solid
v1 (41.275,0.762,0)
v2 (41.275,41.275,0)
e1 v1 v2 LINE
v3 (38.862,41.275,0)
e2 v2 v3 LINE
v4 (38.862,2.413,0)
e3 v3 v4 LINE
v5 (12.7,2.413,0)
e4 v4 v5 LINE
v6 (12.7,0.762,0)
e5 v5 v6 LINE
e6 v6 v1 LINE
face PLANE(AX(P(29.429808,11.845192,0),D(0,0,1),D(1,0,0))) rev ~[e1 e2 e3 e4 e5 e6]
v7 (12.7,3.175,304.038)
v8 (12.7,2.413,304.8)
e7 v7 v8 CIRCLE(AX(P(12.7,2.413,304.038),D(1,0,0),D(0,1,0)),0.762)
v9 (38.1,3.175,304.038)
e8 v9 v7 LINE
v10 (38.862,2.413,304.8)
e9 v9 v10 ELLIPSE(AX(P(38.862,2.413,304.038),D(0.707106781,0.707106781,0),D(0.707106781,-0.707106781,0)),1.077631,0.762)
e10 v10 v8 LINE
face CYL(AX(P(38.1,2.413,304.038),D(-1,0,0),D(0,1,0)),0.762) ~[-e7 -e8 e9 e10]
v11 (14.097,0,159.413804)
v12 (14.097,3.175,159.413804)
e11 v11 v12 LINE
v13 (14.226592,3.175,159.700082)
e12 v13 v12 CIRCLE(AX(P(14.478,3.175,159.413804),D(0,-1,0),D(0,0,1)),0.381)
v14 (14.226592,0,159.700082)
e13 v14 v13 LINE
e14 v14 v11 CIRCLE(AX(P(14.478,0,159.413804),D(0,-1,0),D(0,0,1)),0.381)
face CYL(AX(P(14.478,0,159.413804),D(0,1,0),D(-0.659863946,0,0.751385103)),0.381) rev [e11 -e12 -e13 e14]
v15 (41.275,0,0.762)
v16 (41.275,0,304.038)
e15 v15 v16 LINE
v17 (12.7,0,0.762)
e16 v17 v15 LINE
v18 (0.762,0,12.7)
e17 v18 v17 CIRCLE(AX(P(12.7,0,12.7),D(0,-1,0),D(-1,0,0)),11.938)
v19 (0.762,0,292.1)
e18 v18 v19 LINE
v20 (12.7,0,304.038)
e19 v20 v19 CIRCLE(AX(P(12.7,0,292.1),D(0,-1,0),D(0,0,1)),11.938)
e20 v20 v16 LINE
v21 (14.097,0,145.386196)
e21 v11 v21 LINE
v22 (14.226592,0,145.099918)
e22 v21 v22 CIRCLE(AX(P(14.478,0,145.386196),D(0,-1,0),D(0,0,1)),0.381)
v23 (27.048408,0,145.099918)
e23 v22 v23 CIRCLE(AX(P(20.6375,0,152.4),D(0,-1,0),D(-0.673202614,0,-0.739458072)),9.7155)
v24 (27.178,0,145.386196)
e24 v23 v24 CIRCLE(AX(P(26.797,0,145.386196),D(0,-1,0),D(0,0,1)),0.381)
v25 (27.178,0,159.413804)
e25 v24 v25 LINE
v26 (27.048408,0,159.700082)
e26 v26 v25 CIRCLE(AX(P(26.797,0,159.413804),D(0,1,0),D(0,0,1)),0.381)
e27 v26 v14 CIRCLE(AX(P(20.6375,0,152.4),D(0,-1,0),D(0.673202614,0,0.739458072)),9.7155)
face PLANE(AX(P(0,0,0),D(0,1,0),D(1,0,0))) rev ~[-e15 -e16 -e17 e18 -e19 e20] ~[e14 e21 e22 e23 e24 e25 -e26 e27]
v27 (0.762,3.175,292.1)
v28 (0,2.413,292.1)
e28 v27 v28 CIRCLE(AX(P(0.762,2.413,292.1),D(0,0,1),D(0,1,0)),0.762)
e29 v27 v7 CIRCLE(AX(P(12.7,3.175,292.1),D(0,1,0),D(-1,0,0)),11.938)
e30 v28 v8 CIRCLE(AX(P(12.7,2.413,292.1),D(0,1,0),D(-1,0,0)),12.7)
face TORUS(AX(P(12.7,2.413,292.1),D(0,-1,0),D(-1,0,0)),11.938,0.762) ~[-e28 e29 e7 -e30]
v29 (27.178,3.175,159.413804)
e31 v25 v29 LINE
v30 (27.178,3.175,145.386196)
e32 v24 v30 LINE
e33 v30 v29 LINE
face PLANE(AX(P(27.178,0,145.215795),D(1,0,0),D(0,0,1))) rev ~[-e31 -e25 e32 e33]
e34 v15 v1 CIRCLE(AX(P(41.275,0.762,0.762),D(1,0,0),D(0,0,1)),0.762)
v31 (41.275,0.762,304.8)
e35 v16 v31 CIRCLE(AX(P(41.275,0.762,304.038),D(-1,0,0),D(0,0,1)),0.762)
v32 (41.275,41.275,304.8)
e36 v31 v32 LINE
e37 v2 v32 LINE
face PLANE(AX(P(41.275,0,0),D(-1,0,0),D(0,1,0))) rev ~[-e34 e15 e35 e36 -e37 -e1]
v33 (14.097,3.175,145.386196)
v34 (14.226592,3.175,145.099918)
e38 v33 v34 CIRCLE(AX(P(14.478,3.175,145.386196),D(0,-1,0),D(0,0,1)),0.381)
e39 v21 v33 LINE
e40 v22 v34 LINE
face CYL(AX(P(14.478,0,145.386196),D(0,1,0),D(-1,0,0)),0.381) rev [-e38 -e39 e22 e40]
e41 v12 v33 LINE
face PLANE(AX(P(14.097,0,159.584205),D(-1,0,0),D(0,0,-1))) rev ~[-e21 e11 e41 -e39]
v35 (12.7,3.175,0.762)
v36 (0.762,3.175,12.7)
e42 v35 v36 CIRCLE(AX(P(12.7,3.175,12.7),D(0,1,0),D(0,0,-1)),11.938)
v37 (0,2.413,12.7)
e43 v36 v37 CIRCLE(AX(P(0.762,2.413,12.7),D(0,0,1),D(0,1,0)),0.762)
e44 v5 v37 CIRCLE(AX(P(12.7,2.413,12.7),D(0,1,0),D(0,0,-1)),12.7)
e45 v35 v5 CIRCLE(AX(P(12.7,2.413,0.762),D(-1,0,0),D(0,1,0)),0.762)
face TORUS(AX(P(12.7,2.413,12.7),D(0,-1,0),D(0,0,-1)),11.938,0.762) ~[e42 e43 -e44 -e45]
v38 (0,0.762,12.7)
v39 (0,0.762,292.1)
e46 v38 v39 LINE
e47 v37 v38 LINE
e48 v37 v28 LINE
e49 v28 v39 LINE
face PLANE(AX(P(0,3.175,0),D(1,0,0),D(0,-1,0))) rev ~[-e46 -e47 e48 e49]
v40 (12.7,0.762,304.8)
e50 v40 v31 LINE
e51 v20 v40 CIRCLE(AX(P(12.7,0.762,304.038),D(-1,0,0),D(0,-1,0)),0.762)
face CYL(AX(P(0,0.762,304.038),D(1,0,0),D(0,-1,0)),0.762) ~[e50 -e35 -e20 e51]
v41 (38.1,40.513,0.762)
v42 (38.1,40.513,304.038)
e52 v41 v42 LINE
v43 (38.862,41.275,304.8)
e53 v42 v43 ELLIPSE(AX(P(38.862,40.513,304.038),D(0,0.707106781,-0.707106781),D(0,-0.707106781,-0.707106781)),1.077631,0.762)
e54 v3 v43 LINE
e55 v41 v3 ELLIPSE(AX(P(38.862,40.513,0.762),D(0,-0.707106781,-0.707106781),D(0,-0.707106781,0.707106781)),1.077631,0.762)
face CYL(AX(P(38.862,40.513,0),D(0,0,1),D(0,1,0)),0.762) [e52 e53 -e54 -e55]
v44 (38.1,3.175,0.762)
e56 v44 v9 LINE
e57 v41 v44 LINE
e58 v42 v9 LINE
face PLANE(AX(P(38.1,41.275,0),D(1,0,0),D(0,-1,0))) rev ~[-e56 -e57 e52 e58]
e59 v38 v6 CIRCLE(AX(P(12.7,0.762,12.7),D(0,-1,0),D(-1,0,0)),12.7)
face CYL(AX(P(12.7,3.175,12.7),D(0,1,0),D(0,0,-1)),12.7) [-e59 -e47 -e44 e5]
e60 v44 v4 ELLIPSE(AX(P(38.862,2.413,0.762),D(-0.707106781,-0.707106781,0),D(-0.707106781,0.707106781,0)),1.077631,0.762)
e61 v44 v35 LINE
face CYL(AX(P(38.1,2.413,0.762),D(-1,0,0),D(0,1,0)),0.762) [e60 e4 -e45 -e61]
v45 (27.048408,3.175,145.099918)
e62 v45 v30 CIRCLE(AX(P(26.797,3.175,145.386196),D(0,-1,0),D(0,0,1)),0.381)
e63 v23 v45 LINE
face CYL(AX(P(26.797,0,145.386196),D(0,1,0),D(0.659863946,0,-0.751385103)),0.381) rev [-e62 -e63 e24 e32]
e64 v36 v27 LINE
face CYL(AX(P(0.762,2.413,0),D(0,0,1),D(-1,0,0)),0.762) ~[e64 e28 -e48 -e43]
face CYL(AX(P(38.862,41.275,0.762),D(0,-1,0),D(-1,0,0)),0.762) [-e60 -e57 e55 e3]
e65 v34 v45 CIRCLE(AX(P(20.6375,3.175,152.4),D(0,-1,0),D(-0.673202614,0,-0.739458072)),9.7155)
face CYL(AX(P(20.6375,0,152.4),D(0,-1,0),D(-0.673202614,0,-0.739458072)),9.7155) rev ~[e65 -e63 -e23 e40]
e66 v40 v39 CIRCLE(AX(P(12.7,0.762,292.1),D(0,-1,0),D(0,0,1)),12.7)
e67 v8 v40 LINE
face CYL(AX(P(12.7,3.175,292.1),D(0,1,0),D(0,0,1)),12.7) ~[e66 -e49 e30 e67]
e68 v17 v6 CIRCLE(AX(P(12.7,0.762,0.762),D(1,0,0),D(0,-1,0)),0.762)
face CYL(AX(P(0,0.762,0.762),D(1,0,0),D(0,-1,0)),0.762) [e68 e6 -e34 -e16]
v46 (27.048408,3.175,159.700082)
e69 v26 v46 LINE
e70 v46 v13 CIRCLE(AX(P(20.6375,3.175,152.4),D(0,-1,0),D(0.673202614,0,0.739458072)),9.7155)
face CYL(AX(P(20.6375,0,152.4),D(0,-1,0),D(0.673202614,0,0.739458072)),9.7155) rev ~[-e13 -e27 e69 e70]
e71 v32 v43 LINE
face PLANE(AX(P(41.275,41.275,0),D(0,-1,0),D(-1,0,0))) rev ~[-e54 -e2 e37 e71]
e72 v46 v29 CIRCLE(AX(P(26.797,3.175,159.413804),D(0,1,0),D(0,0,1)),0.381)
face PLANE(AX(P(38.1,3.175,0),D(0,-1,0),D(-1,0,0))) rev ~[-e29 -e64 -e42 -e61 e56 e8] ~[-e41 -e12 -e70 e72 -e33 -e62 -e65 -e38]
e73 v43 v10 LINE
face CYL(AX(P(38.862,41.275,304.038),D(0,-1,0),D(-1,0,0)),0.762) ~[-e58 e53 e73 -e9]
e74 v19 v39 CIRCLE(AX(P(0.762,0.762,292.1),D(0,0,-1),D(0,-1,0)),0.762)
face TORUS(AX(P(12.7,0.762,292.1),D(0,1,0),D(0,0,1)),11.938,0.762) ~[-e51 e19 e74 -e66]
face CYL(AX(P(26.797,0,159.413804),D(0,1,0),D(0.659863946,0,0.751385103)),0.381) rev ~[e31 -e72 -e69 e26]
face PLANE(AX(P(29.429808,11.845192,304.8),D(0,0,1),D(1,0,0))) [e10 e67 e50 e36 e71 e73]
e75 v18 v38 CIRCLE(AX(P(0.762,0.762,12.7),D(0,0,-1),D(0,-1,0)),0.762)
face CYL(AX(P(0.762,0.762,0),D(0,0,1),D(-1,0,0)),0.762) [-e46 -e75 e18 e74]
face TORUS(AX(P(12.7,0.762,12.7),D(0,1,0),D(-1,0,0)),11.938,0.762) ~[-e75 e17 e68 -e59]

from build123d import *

# Parameters (mm, degrees)
F1_DEPTH     = 304.8
F2_R         = 0.762
F5_DEPTH     = 25.4
F6_R         = 0.381
F7_T1_DEPTH  = 3.175
F7_T4_ANGLE  = 90
F7_T6_ANGLE  = 90
F7_T8_ANGLE  = 90
F7_T10_ANGLE = 90


# Not quite as in the source:
# - a fillet or chamfer that OpenCascade refuses, or shapes differently, is made with other operations: its cross-section is extruded or revolved along the edge and cut away or added


with BuildPart() as f1:
    # F0 (on Top) → F1 (new body)
    with BuildSketch(Plane.XY):
        Polygon((0, 3.175), (0, 0), (41.275, 0), (41.275, 41.275), (38.1, 41.275), (38.1, 3.175), align=None)
    extrude(amount=F1_DEPTH)

    # F2
    f2_edges = [f1.edges().sort_by_distance(p)[0] for p in [
        (0, 0, 152.4),
        (20.6375, 0, 304.8),
        (20.6375, 0, 0),
        (38.1, 22.225, 304.8),
        (19.05, 3.175, 304.8),
        (0, 3.175, 152.4),
        (19.05, 3.175, 0),
        (38.1, 22.225, 0),
        (38.1, 41.275, 152.4),
    ]]
    fillet(f2_edges, radius=F2_R)

    # F4 (on face) → F5 (cut)
    with BuildSketch(Plane.XZ):
        with BuildLine():
            ThreePointArc((27.178, 159.5842048969), (20.6375, 162.1155), (14.097, 159.5842048969))
            Line((14.097, 159.5842048969), (14.097, 145.2157951031))
            ThreePointArc((14.097, 145.2157951031), (20.6375, 142.6845), (27.178, 145.2157951031))
            Line((27.178, 145.2157951031), (27.178, 159.5842048969))
        make_face()
    extrude(amount=-F5_DEPTH, mode=Mode.SUBTRACT)

    # F6
    f6_edges = [f1.edges().sort_by_distance(p)[0] for p in [
        (14.097, 1.5875, 145.215795),
        (14.097, 1.5875, 159.584205),
        (27.178, 1.5875, 159.584205),
        (27.178, 1.5875, 145.215795),
    ]]
    fillet(f6_edges, radius=F6_R)

    # F7: fillet of radius 12.7 on 2 edges, made by hand

    # F7_s2 → F7_t1 (cut)
    with BuildSketch(Plane.XZ.offset(-3.175)):
        with BuildLine():
            ThreePointArc((12.7, 304.8), (3.7197438789, 301.0802561211), (0, 292.1))
            Line((0, 292.1), (0, 304.8))
            Line((0, 304.8), (12.7, 304.8))
        make_face()
        with BuildLine():
            ThreePointArc((12.7, 0), (3.7197438789, 3.7197438789), (0, 12.7))
            Line((0, 12.7), (0, 0))
            Line((0, 0), (12.7, 0))
        make_face()
    extrude(amount=F7_T1_DEPTH, mode=Mode.SUBTRACT)

    # F7_s3 → F7_t4 (revolve, cut)
    with BuildSketch(Plane.YZ.offset(12.7)):
        with BuildLine():
            ThreePointArc((3.175, 0.762), (2.9518153673, 0.2231846327), (2.413, 0))
            Line((2.413, 0), (3.175, 0))
            Line((3.175, 0), (3.175, 0.762))
        make_face()
    revolve(axis=Axis((12.7, 3.175, 12.7), (0, 1, 0)), revolution_arc=F7_T4_ANGLE, mode=Mode.SUBTRACT)

    # F7_s5 → F7_t6 (revolve, cut)
    with BuildSketch(Plane.XY.offset(12.7)):
        with BuildLine():
            ThreePointArc((0.762, 0), (0.2231846327, 0.2231846327), (0, 0.762))
            Line((0, 0.762), (0, 0))
            Line((0, 0), (0.762, 0))
        make_face()
    revolve(axis=Axis((12.7, 0, 12.7), (0, -1, 0)), revolution_arc=F7_T6_ANGLE, mode=Mode.SUBTRACT)

    # F7_s7 → F7_t8 (revolve, cut)
    with BuildSketch(Plane.XY.offset(292.1)):
        with BuildLine():
            ThreePointArc((0.762, 3.175), (0.2231846327, 2.9518153673), (0, 2.413))
            Line((0, 2.413), (0, 3.175))
            Line((0, 3.175), (0.762, 3.175))
        make_face()
    revolve(axis=Axis((12.7, 3.175, 292.1), (0, 1, 0)), revolution_arc=F7_T8_ANGLE, mode=Mode.SUBTRACT)

    # F7_s9 → F7_t10 (revolve, cut)
    with BuildSketch(Plane.YZ.offset(12.7)):
        with BuildLine():
            ThreePointArc((0, 304.038), (0.2231846327, 304.5768153673), (0.762, 304.8))
            Line((0.762, 304.8), (0, 304.8))
            Line((0, 304.8), (0, 304.038))
        make_face()
    revolve(axis=Axis((12.7, 0, 292.1), (0, -1, 0)), revolution_arc=F7_T10_ANGLE, mode=Mode.SUBTRACT)


solid = f1.part
